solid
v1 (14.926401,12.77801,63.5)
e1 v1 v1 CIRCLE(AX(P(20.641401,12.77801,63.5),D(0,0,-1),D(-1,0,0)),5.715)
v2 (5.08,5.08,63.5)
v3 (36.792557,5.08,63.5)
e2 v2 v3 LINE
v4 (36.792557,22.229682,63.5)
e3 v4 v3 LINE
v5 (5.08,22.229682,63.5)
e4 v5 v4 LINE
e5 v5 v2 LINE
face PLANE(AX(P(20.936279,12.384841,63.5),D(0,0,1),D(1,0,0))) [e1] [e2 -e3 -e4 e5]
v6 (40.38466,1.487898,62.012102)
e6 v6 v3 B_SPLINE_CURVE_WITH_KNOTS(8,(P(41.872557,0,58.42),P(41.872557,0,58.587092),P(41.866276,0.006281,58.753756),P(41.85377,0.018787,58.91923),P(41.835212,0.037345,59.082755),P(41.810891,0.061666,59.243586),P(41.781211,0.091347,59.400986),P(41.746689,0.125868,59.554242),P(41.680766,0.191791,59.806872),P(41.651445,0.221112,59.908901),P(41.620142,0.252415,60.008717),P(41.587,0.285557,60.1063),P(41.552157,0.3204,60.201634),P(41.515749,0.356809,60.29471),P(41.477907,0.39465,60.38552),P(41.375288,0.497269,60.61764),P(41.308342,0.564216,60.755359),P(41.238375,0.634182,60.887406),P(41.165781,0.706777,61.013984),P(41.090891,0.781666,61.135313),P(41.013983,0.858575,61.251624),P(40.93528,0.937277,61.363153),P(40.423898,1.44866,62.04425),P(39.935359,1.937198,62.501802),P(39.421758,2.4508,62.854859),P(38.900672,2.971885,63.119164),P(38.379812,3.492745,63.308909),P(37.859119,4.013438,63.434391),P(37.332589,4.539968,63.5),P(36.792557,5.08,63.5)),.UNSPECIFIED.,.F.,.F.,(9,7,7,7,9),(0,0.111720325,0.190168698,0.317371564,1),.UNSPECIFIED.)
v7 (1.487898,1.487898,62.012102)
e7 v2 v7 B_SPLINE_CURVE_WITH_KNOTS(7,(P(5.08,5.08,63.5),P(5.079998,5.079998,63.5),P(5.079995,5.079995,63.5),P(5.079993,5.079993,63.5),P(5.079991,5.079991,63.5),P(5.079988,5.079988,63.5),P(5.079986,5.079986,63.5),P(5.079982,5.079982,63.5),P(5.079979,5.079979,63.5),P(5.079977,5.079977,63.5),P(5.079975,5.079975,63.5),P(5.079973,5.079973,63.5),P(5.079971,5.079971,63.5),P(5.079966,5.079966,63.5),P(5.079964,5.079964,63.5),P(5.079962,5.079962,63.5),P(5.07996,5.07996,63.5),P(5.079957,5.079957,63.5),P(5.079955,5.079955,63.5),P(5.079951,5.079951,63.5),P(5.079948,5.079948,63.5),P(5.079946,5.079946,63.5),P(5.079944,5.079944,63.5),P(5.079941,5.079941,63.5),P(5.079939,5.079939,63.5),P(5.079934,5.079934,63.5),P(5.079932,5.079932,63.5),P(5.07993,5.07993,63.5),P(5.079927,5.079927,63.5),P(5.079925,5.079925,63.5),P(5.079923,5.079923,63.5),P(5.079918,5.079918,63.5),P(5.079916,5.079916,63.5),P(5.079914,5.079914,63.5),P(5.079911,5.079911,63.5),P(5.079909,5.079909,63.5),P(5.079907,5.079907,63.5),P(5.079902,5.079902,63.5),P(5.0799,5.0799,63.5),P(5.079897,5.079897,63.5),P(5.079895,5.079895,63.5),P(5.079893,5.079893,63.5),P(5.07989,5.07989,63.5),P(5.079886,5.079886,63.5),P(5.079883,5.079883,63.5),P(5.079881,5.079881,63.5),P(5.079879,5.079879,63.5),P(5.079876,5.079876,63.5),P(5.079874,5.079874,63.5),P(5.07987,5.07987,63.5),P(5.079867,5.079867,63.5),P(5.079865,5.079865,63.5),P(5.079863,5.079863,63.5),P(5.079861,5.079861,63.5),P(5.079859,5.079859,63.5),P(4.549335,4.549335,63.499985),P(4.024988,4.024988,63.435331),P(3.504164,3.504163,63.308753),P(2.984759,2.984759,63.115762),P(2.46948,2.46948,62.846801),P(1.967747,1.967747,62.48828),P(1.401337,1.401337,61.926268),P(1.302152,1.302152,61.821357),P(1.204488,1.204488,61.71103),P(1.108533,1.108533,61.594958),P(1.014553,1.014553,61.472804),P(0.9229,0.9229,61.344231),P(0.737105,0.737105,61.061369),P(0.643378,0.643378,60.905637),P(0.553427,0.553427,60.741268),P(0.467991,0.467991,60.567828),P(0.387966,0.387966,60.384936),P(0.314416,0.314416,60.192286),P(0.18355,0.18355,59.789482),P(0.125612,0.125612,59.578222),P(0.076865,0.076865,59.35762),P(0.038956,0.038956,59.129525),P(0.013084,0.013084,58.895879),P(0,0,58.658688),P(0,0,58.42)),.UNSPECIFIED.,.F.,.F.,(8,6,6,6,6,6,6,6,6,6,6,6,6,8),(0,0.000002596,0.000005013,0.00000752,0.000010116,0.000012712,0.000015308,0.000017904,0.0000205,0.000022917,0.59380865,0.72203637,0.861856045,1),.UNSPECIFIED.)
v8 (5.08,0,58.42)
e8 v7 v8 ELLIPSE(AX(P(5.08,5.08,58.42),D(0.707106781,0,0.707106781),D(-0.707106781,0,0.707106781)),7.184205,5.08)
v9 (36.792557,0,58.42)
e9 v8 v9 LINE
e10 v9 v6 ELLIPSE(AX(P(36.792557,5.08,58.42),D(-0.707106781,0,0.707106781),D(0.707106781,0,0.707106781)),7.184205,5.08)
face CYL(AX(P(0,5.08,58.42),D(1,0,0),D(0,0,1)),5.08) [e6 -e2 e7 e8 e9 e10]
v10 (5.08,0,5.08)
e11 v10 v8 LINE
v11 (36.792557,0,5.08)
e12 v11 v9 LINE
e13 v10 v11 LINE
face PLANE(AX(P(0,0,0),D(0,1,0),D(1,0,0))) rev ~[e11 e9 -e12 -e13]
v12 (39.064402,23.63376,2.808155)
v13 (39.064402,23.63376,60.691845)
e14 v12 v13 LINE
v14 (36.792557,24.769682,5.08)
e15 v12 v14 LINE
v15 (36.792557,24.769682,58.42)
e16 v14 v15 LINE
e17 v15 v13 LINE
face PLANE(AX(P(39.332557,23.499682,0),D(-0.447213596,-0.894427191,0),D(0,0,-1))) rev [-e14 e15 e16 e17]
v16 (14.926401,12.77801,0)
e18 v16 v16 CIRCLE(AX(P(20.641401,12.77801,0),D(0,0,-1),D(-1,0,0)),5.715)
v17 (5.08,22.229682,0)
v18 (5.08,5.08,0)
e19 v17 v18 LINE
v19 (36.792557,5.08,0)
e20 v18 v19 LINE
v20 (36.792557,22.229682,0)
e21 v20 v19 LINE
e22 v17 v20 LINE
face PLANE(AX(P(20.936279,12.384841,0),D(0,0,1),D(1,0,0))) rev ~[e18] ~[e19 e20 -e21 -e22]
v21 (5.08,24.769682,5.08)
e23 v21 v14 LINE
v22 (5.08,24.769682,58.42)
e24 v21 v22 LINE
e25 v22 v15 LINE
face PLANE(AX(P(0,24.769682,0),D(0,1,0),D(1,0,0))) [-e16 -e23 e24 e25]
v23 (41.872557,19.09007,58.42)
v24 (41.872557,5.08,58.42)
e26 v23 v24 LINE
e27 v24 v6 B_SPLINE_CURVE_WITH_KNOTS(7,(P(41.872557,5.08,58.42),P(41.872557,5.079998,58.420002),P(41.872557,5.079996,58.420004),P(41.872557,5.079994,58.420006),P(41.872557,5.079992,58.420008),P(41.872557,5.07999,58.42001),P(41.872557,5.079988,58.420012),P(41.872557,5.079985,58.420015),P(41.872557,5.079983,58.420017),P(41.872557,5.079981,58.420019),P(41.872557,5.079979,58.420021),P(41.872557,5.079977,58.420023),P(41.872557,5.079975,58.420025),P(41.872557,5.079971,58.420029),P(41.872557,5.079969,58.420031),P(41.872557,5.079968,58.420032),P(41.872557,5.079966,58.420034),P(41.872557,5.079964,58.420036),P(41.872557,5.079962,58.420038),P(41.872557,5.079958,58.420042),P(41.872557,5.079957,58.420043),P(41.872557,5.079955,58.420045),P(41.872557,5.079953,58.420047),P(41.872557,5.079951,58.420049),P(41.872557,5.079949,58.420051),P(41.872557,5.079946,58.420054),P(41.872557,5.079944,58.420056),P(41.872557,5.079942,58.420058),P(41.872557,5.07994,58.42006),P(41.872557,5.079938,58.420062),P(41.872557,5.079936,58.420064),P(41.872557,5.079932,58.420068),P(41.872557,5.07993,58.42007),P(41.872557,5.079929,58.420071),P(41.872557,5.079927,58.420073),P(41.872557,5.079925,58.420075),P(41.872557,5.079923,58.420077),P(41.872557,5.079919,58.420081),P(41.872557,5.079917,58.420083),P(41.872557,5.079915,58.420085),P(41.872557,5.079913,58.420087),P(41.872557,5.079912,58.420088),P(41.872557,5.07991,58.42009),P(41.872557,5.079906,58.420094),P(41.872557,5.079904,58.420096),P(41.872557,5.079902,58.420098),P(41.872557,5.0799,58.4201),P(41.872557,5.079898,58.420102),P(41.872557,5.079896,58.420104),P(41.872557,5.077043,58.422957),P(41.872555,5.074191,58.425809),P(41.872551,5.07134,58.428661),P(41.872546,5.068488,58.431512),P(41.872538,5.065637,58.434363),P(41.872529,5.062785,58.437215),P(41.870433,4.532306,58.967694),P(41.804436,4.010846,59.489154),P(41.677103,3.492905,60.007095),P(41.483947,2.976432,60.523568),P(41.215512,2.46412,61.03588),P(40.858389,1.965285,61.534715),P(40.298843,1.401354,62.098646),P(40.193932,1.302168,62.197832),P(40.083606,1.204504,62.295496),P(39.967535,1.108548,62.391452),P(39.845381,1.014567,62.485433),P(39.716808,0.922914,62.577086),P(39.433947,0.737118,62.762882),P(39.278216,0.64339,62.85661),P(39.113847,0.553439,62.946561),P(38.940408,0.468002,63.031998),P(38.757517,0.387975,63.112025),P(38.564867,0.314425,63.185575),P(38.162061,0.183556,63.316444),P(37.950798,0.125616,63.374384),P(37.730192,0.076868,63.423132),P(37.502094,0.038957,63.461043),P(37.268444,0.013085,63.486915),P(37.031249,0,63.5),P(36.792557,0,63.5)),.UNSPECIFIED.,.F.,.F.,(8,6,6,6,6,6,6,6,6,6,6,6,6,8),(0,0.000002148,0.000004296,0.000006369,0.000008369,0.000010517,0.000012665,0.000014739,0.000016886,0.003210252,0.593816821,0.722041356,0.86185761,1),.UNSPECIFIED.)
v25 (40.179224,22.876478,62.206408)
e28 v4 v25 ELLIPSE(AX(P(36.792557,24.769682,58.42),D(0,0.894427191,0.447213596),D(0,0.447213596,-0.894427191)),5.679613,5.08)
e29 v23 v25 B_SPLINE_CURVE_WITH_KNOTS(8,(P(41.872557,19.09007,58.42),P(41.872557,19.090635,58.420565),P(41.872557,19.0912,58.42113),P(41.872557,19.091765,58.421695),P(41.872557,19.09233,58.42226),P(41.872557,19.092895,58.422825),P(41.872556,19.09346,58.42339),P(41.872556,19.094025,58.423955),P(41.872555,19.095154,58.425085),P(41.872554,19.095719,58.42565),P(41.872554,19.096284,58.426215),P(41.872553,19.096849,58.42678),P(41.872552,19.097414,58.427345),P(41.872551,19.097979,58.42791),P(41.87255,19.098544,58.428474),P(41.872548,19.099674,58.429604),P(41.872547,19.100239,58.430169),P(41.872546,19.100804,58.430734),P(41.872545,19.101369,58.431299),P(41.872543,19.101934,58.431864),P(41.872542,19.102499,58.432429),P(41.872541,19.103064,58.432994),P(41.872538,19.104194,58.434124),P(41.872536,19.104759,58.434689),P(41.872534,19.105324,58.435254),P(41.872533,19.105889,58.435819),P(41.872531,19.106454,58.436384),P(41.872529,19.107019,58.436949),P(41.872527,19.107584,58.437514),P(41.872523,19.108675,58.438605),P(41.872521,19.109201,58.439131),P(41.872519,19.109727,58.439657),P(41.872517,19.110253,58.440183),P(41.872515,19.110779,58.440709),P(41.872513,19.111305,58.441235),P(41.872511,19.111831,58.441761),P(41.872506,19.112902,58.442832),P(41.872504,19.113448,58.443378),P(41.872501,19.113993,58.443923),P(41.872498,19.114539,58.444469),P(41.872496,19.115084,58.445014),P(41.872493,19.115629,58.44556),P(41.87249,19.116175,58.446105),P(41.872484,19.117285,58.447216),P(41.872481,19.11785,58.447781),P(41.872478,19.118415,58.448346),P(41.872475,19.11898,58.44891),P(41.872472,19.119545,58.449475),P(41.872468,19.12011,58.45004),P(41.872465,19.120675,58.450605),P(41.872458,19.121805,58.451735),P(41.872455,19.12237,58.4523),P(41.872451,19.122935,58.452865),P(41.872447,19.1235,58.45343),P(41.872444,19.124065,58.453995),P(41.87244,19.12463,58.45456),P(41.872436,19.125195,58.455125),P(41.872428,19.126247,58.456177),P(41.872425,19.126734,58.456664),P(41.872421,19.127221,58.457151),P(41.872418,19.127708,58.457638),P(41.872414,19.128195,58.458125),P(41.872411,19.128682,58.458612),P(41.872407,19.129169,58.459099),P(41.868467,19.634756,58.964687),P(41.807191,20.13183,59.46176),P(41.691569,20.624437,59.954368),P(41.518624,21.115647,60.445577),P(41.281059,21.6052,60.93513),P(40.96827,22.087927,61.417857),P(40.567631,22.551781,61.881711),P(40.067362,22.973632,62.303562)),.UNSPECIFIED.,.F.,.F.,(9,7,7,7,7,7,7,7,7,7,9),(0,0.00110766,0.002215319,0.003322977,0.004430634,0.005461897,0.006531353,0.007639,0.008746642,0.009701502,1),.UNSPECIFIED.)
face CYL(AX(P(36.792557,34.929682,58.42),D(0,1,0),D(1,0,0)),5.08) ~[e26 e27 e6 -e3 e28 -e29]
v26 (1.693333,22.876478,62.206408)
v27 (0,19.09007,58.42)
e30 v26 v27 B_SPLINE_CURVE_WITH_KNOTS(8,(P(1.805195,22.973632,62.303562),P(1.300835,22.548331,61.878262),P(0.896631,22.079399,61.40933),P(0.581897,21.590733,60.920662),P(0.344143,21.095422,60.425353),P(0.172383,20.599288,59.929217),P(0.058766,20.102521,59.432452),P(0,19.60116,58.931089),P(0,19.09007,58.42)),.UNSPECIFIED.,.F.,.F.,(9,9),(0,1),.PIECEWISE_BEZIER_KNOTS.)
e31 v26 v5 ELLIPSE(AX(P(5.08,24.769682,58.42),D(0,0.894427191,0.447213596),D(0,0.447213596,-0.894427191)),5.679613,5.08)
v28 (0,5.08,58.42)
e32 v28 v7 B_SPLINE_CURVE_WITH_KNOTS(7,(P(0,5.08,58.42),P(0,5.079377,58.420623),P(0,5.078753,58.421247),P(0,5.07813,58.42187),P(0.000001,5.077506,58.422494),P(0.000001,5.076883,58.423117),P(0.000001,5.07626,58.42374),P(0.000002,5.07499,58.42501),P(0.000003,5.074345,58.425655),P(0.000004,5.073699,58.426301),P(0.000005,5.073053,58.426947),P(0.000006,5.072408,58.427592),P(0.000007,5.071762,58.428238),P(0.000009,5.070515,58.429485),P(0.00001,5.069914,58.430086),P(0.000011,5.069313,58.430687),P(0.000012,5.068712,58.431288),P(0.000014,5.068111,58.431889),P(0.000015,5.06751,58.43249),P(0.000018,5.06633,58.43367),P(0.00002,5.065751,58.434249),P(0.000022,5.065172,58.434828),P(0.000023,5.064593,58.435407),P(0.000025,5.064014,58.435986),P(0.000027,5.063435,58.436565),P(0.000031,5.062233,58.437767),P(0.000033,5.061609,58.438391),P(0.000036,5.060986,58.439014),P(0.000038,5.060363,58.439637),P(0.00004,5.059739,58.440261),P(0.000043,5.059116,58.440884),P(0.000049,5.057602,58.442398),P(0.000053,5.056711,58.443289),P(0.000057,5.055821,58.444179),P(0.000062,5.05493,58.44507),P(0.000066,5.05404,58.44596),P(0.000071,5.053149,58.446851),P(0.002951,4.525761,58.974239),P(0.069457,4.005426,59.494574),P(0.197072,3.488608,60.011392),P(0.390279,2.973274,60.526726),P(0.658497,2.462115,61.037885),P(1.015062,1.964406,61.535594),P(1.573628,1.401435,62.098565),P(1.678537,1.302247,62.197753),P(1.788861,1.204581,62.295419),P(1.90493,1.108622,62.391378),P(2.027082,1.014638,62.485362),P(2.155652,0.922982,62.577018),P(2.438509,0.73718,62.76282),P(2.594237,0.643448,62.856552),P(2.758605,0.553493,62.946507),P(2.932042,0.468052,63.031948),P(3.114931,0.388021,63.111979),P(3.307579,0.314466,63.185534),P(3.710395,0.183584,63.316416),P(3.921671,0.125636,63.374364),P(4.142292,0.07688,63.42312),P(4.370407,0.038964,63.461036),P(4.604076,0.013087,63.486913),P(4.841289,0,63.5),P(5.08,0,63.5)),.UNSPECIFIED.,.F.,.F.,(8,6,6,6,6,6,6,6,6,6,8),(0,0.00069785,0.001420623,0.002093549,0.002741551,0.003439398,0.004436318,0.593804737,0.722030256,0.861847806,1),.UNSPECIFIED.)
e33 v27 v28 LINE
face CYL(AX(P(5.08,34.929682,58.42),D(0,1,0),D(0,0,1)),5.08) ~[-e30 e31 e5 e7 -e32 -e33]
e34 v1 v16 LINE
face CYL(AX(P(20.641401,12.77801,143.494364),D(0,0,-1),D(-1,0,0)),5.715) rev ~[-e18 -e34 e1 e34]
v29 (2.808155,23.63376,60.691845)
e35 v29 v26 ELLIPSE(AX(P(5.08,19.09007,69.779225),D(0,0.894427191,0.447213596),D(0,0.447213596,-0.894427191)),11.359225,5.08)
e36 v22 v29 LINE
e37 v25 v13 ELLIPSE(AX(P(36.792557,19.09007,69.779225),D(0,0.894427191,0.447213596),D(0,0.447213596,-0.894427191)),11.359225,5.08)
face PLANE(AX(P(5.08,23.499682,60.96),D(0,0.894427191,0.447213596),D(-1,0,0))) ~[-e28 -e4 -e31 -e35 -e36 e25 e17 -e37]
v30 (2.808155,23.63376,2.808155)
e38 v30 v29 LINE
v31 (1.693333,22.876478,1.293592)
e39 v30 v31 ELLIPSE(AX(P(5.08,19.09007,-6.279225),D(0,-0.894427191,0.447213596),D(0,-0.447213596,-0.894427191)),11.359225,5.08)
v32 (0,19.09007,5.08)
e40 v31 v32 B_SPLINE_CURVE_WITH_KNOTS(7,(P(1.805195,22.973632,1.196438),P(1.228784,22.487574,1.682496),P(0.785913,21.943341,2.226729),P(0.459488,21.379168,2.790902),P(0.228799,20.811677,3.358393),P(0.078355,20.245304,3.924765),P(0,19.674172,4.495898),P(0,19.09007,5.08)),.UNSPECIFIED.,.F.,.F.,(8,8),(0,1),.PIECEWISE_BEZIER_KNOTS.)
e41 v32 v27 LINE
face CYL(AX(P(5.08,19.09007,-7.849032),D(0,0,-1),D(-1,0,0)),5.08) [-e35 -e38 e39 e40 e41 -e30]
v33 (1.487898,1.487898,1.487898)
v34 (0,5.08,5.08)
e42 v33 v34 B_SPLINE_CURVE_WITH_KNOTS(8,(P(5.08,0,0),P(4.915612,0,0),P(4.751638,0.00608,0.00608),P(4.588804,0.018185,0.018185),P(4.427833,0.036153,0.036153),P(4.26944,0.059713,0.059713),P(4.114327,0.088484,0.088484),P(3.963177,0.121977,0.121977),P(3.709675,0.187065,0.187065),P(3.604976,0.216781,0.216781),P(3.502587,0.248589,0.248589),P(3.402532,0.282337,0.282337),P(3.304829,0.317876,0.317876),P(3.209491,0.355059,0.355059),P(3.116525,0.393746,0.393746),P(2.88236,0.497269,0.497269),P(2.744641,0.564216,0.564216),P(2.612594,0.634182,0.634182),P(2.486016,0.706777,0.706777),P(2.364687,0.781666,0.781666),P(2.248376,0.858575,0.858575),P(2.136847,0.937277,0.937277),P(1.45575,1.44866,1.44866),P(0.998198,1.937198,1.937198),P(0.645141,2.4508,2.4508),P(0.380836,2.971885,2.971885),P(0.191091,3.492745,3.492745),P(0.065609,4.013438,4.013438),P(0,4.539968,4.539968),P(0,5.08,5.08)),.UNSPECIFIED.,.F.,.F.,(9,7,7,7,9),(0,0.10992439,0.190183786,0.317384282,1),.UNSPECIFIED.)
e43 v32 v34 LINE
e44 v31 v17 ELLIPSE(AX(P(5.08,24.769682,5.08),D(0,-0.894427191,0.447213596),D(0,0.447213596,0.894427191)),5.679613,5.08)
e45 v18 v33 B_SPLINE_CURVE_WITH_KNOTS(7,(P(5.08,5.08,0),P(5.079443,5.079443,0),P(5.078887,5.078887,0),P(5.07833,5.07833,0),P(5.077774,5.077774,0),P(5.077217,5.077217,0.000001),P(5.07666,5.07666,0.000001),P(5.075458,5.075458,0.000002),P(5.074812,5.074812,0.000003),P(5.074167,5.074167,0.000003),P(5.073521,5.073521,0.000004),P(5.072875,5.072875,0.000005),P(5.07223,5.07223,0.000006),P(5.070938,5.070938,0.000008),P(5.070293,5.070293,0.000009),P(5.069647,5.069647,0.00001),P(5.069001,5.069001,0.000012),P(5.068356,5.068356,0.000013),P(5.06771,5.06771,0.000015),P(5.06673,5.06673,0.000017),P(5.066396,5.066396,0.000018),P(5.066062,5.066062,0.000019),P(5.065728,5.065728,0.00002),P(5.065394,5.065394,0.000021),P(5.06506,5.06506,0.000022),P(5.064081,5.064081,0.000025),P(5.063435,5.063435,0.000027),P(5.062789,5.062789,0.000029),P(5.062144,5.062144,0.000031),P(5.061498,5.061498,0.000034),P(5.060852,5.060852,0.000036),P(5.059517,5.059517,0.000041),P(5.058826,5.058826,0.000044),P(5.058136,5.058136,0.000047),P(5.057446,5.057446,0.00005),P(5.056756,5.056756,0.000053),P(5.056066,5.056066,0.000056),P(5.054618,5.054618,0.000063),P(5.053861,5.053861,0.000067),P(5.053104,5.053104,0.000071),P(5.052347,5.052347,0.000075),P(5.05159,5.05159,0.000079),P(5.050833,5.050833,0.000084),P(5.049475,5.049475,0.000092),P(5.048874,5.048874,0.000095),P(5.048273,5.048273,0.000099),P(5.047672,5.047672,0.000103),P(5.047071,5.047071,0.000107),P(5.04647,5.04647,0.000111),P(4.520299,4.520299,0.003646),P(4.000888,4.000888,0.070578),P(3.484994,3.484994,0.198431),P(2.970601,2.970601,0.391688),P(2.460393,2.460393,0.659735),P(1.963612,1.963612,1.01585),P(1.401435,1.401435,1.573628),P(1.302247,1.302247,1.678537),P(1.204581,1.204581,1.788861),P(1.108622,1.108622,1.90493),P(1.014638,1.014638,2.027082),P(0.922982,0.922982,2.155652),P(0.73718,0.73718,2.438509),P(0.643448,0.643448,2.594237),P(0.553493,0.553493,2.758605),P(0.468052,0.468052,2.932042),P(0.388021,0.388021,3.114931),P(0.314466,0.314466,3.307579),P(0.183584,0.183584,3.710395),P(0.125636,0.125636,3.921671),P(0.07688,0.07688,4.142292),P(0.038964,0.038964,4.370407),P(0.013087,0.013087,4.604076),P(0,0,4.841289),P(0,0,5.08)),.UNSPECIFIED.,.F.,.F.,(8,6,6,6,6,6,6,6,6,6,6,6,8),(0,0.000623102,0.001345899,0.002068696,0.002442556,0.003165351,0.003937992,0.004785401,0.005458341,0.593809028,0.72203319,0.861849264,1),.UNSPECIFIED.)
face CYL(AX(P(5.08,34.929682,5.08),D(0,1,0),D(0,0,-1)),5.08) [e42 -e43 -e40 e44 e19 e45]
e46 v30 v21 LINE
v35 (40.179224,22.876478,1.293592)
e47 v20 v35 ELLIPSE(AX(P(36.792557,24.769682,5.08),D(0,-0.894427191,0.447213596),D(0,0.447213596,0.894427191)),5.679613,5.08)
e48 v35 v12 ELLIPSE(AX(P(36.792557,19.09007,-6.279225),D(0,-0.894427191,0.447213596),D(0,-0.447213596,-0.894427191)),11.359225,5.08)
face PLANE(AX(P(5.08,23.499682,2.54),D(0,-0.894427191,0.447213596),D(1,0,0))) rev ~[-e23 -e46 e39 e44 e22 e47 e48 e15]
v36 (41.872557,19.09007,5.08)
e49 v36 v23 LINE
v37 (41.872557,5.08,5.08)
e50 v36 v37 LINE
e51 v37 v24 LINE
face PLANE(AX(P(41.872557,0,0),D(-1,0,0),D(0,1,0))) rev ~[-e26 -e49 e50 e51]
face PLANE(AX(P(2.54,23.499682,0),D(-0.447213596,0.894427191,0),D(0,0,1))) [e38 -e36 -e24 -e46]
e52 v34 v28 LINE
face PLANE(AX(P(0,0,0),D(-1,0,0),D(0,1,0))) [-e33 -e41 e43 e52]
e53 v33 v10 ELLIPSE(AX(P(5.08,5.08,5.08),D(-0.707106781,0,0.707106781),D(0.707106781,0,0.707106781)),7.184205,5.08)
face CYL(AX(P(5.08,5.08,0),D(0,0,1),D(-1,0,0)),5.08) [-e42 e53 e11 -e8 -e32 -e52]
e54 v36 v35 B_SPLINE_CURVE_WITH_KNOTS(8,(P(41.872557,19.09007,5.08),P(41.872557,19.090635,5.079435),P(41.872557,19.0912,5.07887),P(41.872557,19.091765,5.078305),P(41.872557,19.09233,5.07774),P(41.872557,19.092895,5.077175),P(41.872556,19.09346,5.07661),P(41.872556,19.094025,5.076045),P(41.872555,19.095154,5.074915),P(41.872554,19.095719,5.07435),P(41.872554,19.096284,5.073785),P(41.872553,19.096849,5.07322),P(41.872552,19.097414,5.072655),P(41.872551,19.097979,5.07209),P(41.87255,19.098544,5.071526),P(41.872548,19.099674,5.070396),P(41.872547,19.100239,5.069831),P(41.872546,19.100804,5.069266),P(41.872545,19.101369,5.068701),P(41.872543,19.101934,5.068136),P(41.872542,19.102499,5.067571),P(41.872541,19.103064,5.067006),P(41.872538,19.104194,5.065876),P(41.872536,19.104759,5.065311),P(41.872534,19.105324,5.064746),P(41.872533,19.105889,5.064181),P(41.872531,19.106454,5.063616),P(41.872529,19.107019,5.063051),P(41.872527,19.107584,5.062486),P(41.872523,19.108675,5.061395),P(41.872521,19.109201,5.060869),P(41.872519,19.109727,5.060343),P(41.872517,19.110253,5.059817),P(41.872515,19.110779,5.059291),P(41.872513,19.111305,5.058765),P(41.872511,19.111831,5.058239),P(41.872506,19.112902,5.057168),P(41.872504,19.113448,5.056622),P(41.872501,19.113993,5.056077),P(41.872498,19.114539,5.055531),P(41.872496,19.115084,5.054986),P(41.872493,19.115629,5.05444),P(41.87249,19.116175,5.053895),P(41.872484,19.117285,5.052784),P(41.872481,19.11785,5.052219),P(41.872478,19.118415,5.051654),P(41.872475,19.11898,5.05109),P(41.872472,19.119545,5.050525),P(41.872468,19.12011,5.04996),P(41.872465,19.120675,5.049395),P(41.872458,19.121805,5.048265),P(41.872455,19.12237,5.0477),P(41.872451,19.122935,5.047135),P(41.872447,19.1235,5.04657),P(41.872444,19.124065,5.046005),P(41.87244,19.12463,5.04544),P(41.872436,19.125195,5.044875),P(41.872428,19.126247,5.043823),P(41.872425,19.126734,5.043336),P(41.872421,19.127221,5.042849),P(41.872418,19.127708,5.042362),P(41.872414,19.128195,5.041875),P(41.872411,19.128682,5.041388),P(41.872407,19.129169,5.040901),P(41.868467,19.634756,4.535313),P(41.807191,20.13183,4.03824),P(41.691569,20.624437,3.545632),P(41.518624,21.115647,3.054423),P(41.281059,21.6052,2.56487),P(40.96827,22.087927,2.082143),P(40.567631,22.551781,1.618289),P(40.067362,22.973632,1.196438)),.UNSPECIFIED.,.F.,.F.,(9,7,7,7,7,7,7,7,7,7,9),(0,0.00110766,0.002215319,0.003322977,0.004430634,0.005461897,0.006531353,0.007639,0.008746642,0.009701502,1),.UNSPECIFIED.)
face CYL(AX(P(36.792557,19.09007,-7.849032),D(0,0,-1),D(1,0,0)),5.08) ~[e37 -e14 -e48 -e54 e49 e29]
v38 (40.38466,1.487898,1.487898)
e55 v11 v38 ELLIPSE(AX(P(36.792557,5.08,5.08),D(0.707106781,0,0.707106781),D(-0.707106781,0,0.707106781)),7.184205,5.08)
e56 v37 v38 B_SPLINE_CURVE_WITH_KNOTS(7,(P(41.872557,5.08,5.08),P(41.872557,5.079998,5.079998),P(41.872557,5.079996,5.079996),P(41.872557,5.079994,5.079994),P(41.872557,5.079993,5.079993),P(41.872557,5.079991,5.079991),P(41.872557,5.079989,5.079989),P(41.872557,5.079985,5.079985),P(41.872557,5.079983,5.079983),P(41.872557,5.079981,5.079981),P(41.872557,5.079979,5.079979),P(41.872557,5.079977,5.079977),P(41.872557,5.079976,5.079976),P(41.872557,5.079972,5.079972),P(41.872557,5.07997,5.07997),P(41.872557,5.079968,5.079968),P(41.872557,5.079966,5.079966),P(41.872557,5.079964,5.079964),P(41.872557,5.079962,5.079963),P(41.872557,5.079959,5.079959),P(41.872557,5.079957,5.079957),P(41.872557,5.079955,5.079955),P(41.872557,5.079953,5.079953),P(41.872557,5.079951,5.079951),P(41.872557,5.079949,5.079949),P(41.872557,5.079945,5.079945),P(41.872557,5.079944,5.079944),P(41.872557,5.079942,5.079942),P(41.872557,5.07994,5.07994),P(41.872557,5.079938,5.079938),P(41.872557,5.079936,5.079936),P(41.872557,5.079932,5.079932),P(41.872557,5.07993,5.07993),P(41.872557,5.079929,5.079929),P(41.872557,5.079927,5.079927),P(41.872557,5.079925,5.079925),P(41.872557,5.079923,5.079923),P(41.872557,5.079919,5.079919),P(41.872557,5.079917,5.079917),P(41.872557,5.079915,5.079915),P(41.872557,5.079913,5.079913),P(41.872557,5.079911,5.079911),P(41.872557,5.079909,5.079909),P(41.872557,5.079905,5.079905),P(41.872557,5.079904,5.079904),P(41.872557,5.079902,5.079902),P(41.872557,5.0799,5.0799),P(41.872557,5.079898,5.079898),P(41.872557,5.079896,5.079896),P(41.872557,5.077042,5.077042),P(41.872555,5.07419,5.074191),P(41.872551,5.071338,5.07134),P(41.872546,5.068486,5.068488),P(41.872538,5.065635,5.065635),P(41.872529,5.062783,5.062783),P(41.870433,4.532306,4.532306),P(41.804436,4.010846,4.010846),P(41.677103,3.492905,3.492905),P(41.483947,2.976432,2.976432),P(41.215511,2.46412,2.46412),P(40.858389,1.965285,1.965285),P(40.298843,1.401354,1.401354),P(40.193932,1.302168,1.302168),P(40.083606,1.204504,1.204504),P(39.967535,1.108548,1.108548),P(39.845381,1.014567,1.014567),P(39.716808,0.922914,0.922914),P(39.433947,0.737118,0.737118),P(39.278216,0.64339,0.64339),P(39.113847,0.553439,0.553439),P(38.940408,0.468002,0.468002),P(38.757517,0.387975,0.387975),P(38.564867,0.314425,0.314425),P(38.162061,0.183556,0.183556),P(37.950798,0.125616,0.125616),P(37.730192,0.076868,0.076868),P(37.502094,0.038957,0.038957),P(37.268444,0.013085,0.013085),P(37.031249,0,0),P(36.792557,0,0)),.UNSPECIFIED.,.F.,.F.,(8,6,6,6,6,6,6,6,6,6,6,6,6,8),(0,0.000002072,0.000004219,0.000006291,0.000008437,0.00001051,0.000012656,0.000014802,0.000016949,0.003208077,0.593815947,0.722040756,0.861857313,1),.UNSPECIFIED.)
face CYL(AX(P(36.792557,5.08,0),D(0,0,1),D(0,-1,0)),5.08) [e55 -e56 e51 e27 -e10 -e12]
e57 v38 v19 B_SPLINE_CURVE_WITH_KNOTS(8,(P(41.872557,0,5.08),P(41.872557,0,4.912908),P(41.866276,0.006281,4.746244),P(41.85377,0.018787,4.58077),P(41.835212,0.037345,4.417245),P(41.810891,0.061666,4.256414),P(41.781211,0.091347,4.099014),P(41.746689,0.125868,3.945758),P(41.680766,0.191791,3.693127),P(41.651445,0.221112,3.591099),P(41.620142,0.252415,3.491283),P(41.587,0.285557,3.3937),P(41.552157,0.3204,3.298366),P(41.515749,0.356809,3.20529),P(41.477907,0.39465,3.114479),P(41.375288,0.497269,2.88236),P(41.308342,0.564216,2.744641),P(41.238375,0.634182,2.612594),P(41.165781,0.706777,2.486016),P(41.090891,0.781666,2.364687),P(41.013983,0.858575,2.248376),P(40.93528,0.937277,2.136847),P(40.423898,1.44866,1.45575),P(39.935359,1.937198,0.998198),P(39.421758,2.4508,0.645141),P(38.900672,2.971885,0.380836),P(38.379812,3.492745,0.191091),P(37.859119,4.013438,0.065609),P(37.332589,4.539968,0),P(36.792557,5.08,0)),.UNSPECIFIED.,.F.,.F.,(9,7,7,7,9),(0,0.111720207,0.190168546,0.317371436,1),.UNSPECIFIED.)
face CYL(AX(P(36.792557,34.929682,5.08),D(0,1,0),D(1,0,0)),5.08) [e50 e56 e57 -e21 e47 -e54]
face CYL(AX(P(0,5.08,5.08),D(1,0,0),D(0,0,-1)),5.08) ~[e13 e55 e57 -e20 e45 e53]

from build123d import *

# Parameters (mm, degrees)
F0_W        = 41.8725572526
F0_H        = 24.7696824372
F1_DEPTH    = 63.5
F3_D        = 11.43
F4_C1_SIZE2 = 5.08
F4_C1_SIZE  = 2.54
F4_C2_SIZE2 = 2.54
F4_C2_SIZE  = 5.08
F4_C3_SIZE2 = 5.08
F4_C3_SIZE  = 2.54
F4_C4_SIZE2 = 2.54
F4_C4_SIZE  = 5.08
F5_R        = 5.08
F6_T1_DEPTH = 42.5496824372
F6_T3_DEPTH = 79.1980633142
F7_T1_DEPTH = 42.5496824372
F7_T3_DEPTH = 79.1980633142


# Not quite as in the source:
# - a fillet or chamfer that OpenCascade refuses, or shapes differently, is made with other operations: its cross-section is extruded or revolved along the edge and cut away or added


with BuildPart() as f1:
    # F0 (on Top) → F1 (new body)
    with BuildSketch(Plane.XY):
        with Locations((20.9362786263, 12.3848412186)):
            Rectangle(F0_W, F0_H)
    extrude(amount=F1_DEPTH)

    # F3 (through all)
    with Locations(Plane.XY.offset(63.5)):
        with Locations((20.6414014101, 12.7780102193)):
            Hole(F3_D / 2)

    # F4: chamfer of 2.54 x 5.08 on 4 edges, made by hand

    # F4_c1
    f4_c1_edges = [f1.edges().sort_by_distance(p)[0] for p in [
        (0, 24.7696824372, 31.75),
    ]]
    f4_c1_side = f1.faces().sort_by_distance((0, 24.7188824372, 31.75))[0]
    chamfer(f4_c1_edges, length=F4_C1_SIZE, length2=F4_C1_SIZE2, reference=f4_c1_side)

    # F4_c2
    f4_c2_edges = [f1.edges().sort_by_distance(p)[0] for p in [
        (41.8725572526, 24.7696824372, 31.75),
    ]]
    f4_c2_side = f1.faces().sort_by_distance((41.8217572526, 24.7696824372, 31.75))[0]
    chamfer(f4_c2_edges, length=F4_C2_SIZE, length2=F4_C2_SIZE2, reference=f4_c2_side)

    # F4_c3
    f4_c3_edges = [f1.edges().sort_by_distance(p)[0] for p in [
        (20.9362786263, 24.7696824372, 0),
    ]]
    f4_c3_side = f1.faces().sort_by_distance((20.9362786263, 24.7188824372, 0))[0]
    chamfer(f4_c3_edges, length=F4_C3_SIZE, length2=F4_C3_SIZE2, reference=f4_c3_side)

    # F4_c4
    f4_c4_edges = [f1.edges().sort_by_distance(p)[0] for p in [
        (20.9362786263, 24.7696824372, 63.5),
    ]]
    f4_c4_side = f1.faces().sort_by_distance((20.9362786263, 24.7696824372, 63.4492))[0]
    chamfer(f4_c4_edges, length=F4_C4_SIZE, length2=F4_C4_SIZE2, reference=f4_c4_side)

    # F5
    f5_edges = [f1.edges().sort_by_distance(p)[0] for p in [
        (0, 0, 31.75),
        (41.872557, 0, 31.75),
        (20.936279, 0, 0),
        (20.936279, 0, 63.5),
    ]]
    fillet(f5_edges, radius=F5_R)

    # F6: fillet of radius 5.08 on 4 edges, made by hand

    # F6_s2 → F6_t1 (cut)
    with BuildSketch(Plane.XZ.offset(-34.9296824372)):
        with BuildLine():
            ThreePointArc((5.08, 0), (1.4878975516, 1.4878975516), (0, 5.08))
            Line((0, 5.08), (0, 0))
            Line((0, 0), (5.08, 0))
        make_face()
        with BuildLine():
            ThreePointArc((5.08, 63.5), (1.4878975516, 62.0121024484), (0, 58.42))
            Line((0, 58.42), (0, 63.5))
            Line((0, 63.5), (5.08, 63.5))
        make_face()
    extrude(amount=F6_T1_DEPTH, mode=Mode.SUBTRACT)

    # F6_s4 → F6_t3 (cut)
    with BuildSketch(Plane.XY.offset(-7.8490316571)):
        with BuildLine():
            ThreePointArc((0, 19.0900697743), (0.7586938936, 21.7607838239), (2.8081549349, 23.6337599046))
            Line((2.8081549349, 23.6337599046), (0, 22.2296824372))
            Line((0, 22.2296824372), (0, 19.0900697743))
        make_face()
    extrude(amount=F6_T3_DEPTH, mode=Mode.SUBTRACT)

    # F7: fillet of radius 5.08 on 4 edges, made by hand

    # F7_s2 → F7_t1 (cut)
    with BuildSketch(Plane.XZ.offset(-34.9296824372)):
        with BuildLine():
            ThreePointArc((41.8725572526, 5.08), (40.3846597011, 1.4878975516), (36.7925572526, 0))
            Line((36.7925572526, 0), (41.8725572526, 0))
            Line((41.8725572526, 0), (41.8725572526, 5.08))
        make_face()
        with BuildLine():
            ThreePointArc((41.8725572526, 58.42), (40.3846597011, 62.0121024484), (36.7925572526, 63.5))
            Line((36.7925572526, 63.5), (41.8725572526, 63.5))
            Line((41.8725572526, 63.5), (41.8725572526, 58.42))
        make_face()
    extrude(amount=F7_T1_DEPTH, mode=Mode.SUBTRACT)

    # F7_s4 → F7_t3 (cut)
    with BuildSketch(Plane.XY.offset(-7.8490316571)):
        with BuildLine():
            ThreePointArc((41.8725572526, 19.0900697743), (41.1138633591, 21.7607838239), (39.0644023178, 23.6337599046))
            Line((39.0644023178, 23.6337599046), (41.8725572526, 22.2296824372))
            Line((41.8725572526, 22.2296824372), (41.8725572526, 19.0900697743))
        make_face()
    extrude(amount=F7_T3_DEPTH, mode=Mode.SUBTRACT)


solid = f1.part
